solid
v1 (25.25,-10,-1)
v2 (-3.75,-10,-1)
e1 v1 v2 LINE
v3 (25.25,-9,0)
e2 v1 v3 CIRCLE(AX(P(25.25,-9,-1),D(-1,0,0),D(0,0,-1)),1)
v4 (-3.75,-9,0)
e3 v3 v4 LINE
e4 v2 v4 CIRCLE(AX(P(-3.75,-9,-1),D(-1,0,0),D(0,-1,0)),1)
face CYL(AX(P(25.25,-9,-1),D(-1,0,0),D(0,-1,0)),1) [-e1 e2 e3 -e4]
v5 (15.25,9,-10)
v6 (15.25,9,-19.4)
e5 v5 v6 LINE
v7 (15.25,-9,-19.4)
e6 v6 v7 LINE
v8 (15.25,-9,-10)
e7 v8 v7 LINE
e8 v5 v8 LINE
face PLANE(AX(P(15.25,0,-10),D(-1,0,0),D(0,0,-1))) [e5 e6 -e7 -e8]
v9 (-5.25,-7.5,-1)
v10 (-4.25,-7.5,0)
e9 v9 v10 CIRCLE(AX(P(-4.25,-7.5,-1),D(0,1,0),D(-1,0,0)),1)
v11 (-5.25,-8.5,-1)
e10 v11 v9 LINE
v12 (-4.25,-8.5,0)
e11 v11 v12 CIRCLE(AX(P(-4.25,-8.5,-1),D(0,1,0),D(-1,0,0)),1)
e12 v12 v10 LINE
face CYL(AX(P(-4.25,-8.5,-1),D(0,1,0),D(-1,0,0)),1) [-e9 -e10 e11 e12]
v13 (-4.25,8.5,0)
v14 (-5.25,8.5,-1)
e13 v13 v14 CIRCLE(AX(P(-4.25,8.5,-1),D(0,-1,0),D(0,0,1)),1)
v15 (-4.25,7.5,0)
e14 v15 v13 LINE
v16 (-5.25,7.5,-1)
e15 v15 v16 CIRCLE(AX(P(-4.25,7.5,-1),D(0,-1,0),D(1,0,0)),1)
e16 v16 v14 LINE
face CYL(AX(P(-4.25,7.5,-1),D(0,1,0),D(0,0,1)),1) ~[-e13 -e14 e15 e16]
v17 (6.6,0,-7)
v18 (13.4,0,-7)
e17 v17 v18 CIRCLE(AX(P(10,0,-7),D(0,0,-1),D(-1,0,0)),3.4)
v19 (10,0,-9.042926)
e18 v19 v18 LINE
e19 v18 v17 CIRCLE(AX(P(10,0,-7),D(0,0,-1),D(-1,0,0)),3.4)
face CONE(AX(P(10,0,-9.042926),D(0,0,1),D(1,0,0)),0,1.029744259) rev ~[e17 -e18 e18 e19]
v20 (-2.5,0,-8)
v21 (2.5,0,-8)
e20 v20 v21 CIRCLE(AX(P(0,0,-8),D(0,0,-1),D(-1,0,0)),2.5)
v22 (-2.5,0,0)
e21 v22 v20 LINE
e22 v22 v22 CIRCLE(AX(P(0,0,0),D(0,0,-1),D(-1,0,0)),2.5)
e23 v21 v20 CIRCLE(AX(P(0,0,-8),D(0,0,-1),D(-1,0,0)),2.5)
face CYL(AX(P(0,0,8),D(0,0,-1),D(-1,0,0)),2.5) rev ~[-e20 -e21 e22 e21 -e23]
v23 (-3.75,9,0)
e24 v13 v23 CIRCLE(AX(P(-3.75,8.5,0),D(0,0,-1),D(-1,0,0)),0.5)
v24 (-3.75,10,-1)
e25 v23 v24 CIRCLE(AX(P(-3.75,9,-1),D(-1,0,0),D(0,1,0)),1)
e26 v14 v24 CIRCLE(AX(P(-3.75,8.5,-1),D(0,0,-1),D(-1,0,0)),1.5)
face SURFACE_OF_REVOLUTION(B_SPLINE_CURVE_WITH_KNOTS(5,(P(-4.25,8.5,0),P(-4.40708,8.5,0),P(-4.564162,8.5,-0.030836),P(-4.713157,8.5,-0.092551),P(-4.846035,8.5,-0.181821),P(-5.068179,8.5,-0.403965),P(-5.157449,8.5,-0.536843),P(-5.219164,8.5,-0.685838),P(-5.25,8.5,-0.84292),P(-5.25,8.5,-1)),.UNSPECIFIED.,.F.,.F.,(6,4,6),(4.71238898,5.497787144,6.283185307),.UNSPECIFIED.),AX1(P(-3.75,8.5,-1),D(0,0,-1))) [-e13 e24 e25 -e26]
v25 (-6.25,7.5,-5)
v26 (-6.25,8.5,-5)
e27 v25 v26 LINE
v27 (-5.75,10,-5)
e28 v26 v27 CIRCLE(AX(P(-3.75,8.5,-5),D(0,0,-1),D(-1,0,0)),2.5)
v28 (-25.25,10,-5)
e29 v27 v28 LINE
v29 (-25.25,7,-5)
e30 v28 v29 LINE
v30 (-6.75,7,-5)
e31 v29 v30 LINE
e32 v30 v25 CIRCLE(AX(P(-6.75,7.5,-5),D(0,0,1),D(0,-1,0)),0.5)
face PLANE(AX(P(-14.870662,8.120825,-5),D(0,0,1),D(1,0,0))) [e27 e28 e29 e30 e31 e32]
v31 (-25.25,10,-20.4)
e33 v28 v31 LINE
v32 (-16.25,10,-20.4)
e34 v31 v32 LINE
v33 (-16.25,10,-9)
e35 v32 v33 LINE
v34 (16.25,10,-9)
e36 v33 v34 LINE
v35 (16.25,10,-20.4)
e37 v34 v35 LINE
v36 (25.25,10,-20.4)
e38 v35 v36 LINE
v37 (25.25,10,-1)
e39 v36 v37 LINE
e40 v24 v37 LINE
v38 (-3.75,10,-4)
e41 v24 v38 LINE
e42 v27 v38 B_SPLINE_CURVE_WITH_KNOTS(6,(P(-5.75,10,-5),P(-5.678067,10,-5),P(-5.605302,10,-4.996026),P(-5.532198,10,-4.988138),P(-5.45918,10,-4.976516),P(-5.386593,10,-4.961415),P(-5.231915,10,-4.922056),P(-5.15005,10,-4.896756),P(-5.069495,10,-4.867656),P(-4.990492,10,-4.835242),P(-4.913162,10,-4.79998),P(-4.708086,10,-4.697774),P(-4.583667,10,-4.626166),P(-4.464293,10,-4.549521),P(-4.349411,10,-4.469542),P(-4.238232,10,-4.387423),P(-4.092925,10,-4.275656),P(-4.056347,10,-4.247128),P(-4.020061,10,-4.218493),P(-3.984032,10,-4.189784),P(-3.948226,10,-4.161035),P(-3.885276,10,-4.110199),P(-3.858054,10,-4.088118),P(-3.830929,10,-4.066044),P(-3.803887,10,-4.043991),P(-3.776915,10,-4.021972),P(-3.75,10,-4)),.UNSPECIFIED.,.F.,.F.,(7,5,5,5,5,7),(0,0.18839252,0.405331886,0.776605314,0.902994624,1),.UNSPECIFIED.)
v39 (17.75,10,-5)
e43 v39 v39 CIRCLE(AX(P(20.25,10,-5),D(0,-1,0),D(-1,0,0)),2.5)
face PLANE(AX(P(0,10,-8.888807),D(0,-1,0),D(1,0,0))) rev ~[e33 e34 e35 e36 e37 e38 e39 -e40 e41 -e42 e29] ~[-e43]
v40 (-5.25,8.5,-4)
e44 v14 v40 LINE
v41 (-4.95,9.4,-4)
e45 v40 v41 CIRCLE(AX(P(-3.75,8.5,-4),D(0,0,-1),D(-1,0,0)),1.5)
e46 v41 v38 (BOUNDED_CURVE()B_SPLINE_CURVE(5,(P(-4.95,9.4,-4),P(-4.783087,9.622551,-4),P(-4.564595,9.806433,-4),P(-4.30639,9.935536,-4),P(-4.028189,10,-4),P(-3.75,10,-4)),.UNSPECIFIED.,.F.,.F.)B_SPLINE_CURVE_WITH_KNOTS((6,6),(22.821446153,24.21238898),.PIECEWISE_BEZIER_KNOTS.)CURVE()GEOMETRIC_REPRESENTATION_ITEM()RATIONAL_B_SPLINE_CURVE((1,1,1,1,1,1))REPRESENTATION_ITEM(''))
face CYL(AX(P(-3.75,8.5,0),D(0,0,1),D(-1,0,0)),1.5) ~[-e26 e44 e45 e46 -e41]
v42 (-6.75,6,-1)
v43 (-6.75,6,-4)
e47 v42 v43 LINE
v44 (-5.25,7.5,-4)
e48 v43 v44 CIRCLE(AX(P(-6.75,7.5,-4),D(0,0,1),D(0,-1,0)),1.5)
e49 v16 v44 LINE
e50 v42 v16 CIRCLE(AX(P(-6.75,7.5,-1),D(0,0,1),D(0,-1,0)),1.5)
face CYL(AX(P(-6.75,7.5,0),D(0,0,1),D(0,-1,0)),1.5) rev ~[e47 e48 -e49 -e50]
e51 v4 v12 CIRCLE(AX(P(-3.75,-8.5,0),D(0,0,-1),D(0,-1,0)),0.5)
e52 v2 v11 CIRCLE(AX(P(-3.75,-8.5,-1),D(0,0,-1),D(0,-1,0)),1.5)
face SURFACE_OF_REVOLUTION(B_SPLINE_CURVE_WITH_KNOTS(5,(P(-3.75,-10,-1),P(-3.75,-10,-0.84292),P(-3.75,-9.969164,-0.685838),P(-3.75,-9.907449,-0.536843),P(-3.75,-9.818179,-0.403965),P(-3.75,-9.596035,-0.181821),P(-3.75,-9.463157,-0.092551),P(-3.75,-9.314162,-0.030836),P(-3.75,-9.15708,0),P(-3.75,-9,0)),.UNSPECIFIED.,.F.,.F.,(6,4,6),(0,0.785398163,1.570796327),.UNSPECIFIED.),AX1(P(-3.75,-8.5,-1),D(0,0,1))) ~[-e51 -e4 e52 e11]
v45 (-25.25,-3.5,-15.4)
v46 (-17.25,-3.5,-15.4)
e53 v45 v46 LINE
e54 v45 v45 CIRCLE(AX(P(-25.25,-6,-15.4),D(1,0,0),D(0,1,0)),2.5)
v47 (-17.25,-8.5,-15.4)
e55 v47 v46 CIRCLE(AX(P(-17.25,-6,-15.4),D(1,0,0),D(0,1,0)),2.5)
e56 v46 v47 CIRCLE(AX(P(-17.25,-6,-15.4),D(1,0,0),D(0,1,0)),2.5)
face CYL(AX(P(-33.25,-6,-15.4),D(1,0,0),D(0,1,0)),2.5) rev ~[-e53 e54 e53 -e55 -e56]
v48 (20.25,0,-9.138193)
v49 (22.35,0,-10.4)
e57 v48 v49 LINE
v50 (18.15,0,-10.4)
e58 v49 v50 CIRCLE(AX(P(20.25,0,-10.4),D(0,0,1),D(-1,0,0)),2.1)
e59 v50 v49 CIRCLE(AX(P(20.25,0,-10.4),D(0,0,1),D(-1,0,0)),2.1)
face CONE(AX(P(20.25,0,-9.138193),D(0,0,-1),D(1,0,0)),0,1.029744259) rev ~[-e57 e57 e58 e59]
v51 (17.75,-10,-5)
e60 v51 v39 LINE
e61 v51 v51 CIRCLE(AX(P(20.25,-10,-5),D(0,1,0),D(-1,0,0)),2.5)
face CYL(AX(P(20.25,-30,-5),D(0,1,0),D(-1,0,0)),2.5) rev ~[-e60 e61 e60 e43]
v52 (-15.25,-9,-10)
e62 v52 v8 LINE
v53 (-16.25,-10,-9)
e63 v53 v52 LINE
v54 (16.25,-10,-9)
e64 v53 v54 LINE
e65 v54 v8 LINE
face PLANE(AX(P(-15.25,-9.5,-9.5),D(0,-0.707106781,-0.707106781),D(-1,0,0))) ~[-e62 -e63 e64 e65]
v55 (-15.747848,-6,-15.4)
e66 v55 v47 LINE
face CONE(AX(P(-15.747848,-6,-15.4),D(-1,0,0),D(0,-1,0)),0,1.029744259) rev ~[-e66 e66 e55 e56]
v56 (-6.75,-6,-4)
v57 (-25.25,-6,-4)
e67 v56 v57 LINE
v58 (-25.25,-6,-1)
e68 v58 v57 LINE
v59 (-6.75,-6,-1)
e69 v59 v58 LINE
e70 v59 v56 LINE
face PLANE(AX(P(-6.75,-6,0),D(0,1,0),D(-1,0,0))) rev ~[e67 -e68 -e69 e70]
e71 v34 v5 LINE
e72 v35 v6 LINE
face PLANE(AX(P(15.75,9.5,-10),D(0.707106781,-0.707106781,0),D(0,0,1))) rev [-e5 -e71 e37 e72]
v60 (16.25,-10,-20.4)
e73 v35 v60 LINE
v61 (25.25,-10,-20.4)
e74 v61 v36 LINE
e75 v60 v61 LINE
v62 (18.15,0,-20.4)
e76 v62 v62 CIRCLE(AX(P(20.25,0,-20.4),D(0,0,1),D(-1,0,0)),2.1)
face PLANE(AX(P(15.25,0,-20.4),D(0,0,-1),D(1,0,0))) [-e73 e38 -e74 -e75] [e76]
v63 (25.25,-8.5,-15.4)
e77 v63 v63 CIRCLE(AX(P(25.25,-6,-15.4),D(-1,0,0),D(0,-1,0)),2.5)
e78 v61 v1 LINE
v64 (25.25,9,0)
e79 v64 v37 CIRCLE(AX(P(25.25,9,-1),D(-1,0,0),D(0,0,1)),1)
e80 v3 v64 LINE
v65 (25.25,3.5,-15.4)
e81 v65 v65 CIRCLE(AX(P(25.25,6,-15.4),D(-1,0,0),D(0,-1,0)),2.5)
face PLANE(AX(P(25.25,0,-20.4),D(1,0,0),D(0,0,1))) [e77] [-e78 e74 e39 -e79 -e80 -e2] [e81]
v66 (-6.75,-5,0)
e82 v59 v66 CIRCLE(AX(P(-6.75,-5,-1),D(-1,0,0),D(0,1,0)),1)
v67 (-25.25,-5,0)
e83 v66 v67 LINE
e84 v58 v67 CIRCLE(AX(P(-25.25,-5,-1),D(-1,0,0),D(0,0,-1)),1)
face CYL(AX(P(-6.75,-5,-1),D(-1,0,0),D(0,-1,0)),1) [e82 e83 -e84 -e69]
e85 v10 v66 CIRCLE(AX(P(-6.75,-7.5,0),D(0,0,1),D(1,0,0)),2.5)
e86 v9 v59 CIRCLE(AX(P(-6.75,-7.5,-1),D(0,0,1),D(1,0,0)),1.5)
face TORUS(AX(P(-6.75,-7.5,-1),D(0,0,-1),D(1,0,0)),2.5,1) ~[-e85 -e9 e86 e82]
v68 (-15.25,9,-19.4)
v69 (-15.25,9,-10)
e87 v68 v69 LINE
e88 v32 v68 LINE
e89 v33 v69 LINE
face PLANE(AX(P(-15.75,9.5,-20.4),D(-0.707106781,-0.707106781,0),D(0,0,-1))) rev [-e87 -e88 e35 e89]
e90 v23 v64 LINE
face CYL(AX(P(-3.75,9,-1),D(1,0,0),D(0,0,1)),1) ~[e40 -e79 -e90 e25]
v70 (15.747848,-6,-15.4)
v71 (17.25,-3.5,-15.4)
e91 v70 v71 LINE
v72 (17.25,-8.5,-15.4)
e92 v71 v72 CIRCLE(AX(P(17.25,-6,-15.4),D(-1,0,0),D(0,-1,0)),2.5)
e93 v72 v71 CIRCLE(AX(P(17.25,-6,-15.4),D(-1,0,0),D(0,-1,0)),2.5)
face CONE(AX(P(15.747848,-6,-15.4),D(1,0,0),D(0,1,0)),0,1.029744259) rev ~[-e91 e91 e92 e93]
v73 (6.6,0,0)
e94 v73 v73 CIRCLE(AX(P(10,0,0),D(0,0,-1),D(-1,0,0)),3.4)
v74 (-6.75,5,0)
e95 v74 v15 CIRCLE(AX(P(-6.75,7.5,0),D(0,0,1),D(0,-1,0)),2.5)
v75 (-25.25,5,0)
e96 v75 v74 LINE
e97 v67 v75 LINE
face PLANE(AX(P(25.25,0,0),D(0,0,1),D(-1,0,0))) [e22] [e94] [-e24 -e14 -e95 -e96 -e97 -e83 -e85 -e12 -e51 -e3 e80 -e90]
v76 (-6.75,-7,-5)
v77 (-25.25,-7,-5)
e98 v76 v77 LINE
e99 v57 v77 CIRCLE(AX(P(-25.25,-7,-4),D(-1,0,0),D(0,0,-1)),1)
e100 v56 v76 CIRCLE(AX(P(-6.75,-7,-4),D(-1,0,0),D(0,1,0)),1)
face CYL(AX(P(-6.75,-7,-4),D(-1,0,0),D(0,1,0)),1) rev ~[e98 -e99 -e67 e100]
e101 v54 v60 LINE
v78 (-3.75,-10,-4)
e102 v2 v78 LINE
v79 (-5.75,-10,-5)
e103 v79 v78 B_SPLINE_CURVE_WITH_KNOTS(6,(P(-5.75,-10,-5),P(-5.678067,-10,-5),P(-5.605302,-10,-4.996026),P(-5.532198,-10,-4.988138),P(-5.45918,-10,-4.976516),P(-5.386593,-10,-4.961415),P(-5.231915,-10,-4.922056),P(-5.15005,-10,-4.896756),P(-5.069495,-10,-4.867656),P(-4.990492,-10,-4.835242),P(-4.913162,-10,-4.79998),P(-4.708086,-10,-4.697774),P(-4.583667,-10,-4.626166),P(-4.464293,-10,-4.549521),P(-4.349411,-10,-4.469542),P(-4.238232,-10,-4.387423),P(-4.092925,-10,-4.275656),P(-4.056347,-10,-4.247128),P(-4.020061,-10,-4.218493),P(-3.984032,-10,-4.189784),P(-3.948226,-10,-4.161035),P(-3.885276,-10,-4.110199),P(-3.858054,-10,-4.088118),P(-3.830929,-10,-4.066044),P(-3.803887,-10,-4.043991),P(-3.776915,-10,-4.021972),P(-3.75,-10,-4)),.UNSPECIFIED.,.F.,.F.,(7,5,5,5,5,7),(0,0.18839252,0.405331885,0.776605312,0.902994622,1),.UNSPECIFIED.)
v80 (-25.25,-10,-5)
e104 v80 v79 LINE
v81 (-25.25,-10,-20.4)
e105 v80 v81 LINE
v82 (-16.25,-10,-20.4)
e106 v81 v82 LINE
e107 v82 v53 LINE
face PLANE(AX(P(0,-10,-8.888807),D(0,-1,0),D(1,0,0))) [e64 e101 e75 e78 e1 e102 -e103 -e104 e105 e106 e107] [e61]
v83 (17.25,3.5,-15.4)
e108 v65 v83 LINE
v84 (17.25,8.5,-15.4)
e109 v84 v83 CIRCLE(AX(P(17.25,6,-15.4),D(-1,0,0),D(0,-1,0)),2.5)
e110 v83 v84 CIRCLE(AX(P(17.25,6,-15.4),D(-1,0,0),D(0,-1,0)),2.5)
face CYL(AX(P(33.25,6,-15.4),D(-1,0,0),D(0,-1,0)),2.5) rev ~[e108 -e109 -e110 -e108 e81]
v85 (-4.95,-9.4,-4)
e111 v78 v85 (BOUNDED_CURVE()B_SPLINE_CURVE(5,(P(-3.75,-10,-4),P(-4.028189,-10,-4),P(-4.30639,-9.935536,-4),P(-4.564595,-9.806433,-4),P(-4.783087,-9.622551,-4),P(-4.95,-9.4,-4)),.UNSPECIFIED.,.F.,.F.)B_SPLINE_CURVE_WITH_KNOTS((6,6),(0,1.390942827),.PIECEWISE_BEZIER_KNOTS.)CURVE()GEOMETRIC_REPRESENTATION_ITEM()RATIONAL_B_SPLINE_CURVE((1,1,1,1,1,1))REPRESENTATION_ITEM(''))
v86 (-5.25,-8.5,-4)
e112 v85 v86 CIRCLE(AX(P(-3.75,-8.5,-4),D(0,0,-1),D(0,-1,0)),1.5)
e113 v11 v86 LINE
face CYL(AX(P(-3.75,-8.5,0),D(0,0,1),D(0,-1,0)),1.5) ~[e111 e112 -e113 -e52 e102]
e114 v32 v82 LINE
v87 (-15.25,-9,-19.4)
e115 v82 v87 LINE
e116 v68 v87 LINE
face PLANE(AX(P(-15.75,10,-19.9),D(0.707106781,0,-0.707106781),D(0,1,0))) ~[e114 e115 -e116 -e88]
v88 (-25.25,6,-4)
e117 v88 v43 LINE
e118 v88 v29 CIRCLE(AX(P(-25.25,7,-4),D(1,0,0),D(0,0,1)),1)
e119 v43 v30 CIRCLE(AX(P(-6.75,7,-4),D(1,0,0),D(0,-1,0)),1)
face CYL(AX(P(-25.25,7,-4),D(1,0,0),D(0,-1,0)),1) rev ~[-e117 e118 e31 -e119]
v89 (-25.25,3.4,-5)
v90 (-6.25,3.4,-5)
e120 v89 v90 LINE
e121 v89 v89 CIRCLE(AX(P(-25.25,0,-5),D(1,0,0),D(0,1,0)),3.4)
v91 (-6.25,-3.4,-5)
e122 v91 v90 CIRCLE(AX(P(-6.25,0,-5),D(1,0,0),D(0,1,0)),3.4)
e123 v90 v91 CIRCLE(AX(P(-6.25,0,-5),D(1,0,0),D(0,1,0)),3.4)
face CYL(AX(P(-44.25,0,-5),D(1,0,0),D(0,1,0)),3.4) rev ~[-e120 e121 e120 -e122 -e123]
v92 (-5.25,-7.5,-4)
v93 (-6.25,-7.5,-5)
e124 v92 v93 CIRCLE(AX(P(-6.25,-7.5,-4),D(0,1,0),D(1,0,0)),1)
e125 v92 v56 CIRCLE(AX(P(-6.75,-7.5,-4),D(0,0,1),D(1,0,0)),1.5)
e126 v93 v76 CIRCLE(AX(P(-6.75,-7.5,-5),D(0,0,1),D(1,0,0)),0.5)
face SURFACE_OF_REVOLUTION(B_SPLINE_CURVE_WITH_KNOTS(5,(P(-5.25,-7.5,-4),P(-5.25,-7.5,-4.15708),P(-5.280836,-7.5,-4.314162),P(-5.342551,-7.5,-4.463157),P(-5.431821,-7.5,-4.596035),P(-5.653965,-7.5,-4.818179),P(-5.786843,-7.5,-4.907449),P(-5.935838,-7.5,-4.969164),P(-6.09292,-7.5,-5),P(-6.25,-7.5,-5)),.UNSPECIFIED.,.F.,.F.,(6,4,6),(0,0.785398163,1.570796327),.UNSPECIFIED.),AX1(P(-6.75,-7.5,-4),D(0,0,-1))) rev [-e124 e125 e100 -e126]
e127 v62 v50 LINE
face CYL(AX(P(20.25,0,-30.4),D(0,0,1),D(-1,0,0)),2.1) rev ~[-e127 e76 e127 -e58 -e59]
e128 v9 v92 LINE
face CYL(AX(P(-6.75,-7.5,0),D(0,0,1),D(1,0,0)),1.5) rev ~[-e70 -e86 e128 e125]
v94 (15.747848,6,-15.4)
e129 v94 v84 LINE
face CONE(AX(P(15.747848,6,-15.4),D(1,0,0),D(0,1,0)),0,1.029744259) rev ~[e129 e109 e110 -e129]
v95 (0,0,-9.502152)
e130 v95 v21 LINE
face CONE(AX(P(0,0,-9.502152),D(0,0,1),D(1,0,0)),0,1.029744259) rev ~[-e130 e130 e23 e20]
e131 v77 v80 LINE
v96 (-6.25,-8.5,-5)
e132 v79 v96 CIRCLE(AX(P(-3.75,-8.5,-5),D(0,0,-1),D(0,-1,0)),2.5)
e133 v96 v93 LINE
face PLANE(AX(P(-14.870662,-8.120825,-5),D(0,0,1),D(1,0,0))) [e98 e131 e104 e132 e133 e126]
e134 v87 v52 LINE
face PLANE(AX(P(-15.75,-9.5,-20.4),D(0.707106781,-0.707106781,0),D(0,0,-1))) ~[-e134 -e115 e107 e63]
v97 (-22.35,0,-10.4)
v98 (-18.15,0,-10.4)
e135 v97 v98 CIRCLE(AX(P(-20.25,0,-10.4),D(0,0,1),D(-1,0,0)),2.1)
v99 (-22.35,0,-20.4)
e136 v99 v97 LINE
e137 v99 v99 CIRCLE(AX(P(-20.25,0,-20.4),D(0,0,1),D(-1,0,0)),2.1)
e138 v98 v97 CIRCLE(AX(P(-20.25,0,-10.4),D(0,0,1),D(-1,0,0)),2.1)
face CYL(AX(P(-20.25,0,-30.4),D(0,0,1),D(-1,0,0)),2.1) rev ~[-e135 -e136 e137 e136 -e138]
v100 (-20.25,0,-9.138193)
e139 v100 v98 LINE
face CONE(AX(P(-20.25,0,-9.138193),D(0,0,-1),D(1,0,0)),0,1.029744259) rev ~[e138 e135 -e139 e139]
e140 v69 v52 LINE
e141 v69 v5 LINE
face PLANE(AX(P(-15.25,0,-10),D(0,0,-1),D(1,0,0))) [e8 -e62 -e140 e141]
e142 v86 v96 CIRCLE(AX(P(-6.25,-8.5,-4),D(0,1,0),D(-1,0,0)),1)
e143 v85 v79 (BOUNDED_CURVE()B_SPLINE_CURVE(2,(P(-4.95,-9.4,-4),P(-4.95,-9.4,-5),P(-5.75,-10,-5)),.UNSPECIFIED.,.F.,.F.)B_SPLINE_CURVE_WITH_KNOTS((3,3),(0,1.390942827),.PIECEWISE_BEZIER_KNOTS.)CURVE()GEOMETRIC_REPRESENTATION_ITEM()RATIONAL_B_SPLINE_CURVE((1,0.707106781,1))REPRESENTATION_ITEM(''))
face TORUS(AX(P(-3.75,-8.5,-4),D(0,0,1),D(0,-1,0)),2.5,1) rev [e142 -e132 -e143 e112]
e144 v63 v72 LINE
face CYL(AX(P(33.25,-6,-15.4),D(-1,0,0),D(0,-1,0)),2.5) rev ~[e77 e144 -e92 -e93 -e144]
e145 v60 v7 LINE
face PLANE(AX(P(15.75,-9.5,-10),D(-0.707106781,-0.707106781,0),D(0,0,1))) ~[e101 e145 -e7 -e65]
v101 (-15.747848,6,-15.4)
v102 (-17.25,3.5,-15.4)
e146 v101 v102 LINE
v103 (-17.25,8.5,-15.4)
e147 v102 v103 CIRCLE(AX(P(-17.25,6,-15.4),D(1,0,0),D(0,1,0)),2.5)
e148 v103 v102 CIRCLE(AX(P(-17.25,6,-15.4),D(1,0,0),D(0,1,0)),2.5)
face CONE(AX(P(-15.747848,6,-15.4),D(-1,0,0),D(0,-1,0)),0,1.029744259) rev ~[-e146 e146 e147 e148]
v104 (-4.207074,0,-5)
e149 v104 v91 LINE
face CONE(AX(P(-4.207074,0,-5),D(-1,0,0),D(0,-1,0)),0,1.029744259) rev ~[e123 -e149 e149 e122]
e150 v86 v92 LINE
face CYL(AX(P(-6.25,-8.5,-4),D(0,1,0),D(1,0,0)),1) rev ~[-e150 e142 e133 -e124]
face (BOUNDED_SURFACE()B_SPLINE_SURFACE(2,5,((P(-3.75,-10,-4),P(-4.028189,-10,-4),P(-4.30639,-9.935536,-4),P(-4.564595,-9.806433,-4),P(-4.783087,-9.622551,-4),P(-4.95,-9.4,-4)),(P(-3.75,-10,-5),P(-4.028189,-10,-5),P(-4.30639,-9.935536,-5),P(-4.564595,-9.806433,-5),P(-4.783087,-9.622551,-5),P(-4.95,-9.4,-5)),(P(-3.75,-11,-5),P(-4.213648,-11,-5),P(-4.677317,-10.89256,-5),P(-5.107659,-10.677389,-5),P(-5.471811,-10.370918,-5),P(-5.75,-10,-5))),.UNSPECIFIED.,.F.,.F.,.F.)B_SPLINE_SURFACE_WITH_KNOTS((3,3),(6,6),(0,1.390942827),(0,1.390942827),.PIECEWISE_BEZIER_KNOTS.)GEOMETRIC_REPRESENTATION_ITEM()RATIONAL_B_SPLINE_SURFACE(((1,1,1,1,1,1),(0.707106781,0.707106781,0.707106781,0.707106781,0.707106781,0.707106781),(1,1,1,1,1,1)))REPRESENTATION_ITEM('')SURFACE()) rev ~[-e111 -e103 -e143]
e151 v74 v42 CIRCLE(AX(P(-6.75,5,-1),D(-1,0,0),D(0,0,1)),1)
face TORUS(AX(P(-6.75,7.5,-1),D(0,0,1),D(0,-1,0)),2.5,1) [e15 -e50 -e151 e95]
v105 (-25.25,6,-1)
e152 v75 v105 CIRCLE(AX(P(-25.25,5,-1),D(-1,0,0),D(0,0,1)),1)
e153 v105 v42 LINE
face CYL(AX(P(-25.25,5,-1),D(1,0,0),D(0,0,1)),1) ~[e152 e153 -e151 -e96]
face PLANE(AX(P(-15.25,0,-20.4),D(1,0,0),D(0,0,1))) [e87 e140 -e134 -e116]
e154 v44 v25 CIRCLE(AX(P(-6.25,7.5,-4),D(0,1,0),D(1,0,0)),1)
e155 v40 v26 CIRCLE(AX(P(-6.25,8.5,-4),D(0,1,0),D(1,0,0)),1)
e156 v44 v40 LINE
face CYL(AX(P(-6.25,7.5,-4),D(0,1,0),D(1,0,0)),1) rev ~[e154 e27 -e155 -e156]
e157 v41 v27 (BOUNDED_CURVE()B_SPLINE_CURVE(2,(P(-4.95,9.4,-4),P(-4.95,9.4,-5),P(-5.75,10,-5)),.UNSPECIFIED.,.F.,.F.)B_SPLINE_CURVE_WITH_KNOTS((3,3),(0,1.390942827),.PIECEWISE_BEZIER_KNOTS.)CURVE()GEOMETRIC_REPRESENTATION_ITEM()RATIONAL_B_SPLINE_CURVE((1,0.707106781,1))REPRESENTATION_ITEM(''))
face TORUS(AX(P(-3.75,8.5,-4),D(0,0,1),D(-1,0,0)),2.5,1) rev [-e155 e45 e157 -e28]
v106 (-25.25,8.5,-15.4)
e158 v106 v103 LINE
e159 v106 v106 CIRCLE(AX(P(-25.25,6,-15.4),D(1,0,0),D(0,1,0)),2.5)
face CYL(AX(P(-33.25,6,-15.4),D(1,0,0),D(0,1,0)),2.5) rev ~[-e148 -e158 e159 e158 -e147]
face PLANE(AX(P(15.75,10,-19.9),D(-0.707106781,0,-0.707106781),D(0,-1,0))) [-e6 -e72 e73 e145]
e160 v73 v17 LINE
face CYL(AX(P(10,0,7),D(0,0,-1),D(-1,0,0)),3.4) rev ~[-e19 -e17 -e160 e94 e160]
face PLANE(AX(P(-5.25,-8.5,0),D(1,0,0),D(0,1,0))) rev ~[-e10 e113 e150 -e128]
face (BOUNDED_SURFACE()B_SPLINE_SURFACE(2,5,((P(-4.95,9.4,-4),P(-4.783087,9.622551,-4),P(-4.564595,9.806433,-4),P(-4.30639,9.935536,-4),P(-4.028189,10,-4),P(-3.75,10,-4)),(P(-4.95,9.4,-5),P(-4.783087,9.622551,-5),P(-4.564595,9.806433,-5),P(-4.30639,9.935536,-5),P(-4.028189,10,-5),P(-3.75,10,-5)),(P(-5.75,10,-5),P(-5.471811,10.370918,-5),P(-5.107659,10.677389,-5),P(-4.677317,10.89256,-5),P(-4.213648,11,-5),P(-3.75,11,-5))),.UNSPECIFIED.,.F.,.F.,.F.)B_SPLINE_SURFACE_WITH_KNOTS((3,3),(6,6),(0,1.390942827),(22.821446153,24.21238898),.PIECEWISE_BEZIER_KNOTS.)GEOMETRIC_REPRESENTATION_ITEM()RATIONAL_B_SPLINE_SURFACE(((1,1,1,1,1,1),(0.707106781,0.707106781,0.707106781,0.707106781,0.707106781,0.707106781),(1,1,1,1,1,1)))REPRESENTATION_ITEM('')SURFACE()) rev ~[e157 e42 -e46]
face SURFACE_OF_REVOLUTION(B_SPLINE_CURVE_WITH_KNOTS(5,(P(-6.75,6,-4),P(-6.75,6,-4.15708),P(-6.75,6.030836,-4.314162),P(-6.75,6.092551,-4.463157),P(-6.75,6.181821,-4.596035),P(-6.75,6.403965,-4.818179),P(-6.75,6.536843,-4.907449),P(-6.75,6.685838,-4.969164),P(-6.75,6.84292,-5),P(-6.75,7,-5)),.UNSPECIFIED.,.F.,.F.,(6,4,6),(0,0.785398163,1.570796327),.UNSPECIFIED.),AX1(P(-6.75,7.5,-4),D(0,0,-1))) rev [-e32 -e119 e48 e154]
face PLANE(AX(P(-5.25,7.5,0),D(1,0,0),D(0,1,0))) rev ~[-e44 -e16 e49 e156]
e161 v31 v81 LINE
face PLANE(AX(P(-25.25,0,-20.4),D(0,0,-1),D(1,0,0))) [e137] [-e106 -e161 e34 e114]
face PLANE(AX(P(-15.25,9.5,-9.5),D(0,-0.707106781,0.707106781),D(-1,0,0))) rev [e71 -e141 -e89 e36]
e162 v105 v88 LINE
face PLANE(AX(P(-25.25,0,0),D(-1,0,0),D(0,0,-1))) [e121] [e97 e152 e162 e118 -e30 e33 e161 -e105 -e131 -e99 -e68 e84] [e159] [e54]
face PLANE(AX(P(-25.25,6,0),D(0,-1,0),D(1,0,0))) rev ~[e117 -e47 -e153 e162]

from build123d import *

# Parameters (mm, degrees)
F1_DEPTH       = 10
F5_D           = 5
F5_DEPTH       = 8
F5_TIP         = 1.5021515476
F5_ON_F4_D     = 5
F5_ON_F4_DEPTH = 8
F5_ON_F4_TIP   = 1.5021515476
F6_D           = 6.8
F6_DEPTH       = 19
F6_TIP         = 2.0429261047
F8_D           = 4.2
F8_DEPTH       = 10
F8_TIP         = 1.2618073
F10_D          = 5
F10_DEPTH      = 20
F10_TIP        = 1.5021515476
F13_D          = 6.8
F13_DEPTH      = 7
F13_TIP        = 2.0429261047
F14_D          = 5
F14_DEPTH      = 8
F14_TIP        = 1.5021515476
F16_DEPTH      = 5
F17_SIZE       = 1
F18_F1_R       = 1
F18_F2_R       = 1
F18_F3_R       = 1
F18_F4_R       = 1


# Not quite as in the source:
# - a feature names something its author has since deleted; it is built from what else it names


with BuildPart() as f1:
    # F0 (on Front) → F1 (new body, symmetric)
    with BuildSketch(Plane.XZ):
        Polygon((-25.25, 0), (-25.25, -20.4), (-15.25, -20.4), (-15.25, -10), (15.25, -10), (15.25, -20.4), (25.25, -20.4), (25.25, 0), align=None)
    extrude(amount=F1_DEPTH, both=True)

    # F5
    with Locations(Plane(origin=(-25.25, 0, 0), x_dir=(0, -1, 0), z_dir=(-1, 0, 0))):
        with Locations((6, -15.4), (-6, -15.4)):
            Hole(F5_D / 2, depth=F5_DEPTH)
            with Locations((0, 0, -(F5_DEPTH + F5_TIP / 2))):  # 118° drill point
                Cone(0, F5_D / 2, F5_TIP, mode=Mode.SUBTRACT)

    # F5 on F4
    with Locations(Plane.YZ.offset(25.25)):
        with Locations((-6, -15.4), (6, -15.4)):
            Hole(F5_ON_F4_D / 2, depth=F5_ON_F4_DEPTH)
            with Locations((0, 0, -(F5_ON_F4_DEPTH + F5_ON_F4_TIP / 2))):  # 118° drill point
                Cone(0, F5_ON_F4_D / 2, F5_ON_F4_TIP, mode=Mode.SUBTRACT)

    # F6
    with Locations(Plane(origin=(-25.25, 0, 0), x_dir=(0, -1, 0), z_dir=(-1, 0, 0))):
        with Locations((0, -5)):
            Hole(F6_D / 2, depth=F6_DEPTH)
            with Locations((0, 0, -(F6_DEPTH + F6_TIP / 2))):  # 118° drill point
                Cone(0, F6_D / 2, F6_TIP, mode=Mode.SUBTRACT)

    # F8
    with Locations(Plane(origin=(0, 0, -20.4), x_dir=(1, 0, 0), z_dir=(0, 0, -1))):
        with Locations((-20.25, 0), (20.25, 0)):
            Hole(F8_D / 2, depth=F8_DEPTH)
            with Locations((0, 0, -(F8_DEPTH + F8_TIP / 2))):  # 118° drill point
                Cone(0, F8_D / 2, F8_TIP, mode=Mode.SUBTRACT)

    # F10
    with Locations(Plane.XZ.offset(10)):
        with Locations((20.25, -5)):
            Hole(F10_D / 2, depth=F10_DEPTH)
            with Locations((0, 0, -(F10_DEPTH + F10_TIP / 2))):  # 118° drill point
                Cone(0, F10_D / 2, F10_TIP, mode=Mode.SUBTRACT)

    # F13
    with Locations(Plane.XY):
        with Locations((10, 0)):
            Hole(F13_D / 2, depth=F13_DEPTH)
            with Locations((0, 0, -(F13_DEPTH + F13_TIP / 2))):  # 118° drill point
                Cone(0, F13_D / 2, F13_TIP, mode=Mode.SUBTRACT)

    # F14
    with Locations(Plane.XY):
        with Locations((0, 0)):
            Hole(F14_D / 2, depth=F14_DEPTH)
            with Locations((0, 0, -(F14_DEPTH + F14_TIP / 2))):  # 118° drill point
                Cone(0, F14_D / 2, F14_TIP, mode=Mode.SUBTRACT)

    # F15 (on face) → F16 (cut)
    with BuildSketch(Plane.XY):
        with BuildLine():
            Line((-6.75, -6), (-25.25, -6))
            Line((-25.25, -6), (-25.25, -10))
            Line((-25.25, -10), (-3.75, -10))
            ThreePointArc((-3.75, -10), (-4.8106601718, -9.5606601718), (-5.25, -8.5))
            Line((-5.25, -8.5), (-5.25, -7.5))
            ThreePointArc((-5.25, -7.5), (-5.6893398282, -6.4393398282), (-6.75, -6))
        make_face()
        with BuildLine():
            Line((-25.25, 10), (-25.25, 6))
            Line((-25.25, 6), (-6.75, 6))
            ThreePointArc((-6.75, 6), (-5.6893398282, 6.4393398282), (-5.25, 7.5))
            Line((-5.25, 7.5), (-5.25, 8.5))
            ThreePointArc((-5.25, 8.5), (-4.8106601718, 9.5606601718), (-3.75, 10))
            Line((-3.75, 10), (-25.25, 10))
        make_face()
    extrude(amount=-F16_DEPTH, mode=Mode.SUBTRACT)

    # F17
    f17_edges = [f1.edges().sort_by_distance(p)[0] for p in [
        (15.25, 0, -20.4),
        (-15.25, 0, -20.4),
        (-15.25, -10, -15.2),
        (0, -10, -10),
        (15.25, -10, -15.2),
        (0, 10, -10),
        (-15.25, 10, -15.2),
        (15.25, 10, -15.2),
    ]]
    chamfer(f17_edges, length=F17_SIZE)

    # F18: fillet of radius 1 on 16 edges, made by hand

    # F18_f1
    f18_f1_edges = [f1.edges().sort_by_distance(p)[0] for p in [
        (10.75, -10, 0),
        (-4.8106601718, -9.5606601718, 0),
        (-5.25, -8, 0),
        (-5.6893398282, -6.4393398282, 0),
        (-16, -6, 0),
    ]]
    fillet(f18_f1_edges, radius=F18_F1_R)

    # F18_f2
    f18_f2_edges = [f1.edges().sort_by_distance(p)[0] for p in [
        (-16, 6, 0),
        (-5.6893398282, 6.4393398282, 0),
        (-5.25, 8, 0),
        (-4.8106601718, 9.5606601718, 0),
        (10.75, 10, 0),
    ]]
    fillet(f18_f2_edges, radius=F18_F2_R)

    # F18_f3
    f18_f3_edges = [f1.edges().sort_by_distance(p)[0] for p in [
        (-4.8106601718, -9.5606601718, -5),
        (-16, -6, -5),
        (-5.25, -8, -5),
        (-5.6893398282, -6.4393398282, -5),
    ]]
    fillet(f18_f3_edges, radius=F18_F3_R)

    # F18_f4
    f18_f4_edges = [f1.edges().sort_by_distance(p)[0] for p in [
        (-16, 6, -5),
        (-5.6893398282, 6.4393398282, -5),
        (-5.25, 8, -5),
        (-4.8106601718, 9.5606601718, -5),
    ]]
    fillet(f18_f4_edges, radius=F18_F4_R)


solid = f1.part
